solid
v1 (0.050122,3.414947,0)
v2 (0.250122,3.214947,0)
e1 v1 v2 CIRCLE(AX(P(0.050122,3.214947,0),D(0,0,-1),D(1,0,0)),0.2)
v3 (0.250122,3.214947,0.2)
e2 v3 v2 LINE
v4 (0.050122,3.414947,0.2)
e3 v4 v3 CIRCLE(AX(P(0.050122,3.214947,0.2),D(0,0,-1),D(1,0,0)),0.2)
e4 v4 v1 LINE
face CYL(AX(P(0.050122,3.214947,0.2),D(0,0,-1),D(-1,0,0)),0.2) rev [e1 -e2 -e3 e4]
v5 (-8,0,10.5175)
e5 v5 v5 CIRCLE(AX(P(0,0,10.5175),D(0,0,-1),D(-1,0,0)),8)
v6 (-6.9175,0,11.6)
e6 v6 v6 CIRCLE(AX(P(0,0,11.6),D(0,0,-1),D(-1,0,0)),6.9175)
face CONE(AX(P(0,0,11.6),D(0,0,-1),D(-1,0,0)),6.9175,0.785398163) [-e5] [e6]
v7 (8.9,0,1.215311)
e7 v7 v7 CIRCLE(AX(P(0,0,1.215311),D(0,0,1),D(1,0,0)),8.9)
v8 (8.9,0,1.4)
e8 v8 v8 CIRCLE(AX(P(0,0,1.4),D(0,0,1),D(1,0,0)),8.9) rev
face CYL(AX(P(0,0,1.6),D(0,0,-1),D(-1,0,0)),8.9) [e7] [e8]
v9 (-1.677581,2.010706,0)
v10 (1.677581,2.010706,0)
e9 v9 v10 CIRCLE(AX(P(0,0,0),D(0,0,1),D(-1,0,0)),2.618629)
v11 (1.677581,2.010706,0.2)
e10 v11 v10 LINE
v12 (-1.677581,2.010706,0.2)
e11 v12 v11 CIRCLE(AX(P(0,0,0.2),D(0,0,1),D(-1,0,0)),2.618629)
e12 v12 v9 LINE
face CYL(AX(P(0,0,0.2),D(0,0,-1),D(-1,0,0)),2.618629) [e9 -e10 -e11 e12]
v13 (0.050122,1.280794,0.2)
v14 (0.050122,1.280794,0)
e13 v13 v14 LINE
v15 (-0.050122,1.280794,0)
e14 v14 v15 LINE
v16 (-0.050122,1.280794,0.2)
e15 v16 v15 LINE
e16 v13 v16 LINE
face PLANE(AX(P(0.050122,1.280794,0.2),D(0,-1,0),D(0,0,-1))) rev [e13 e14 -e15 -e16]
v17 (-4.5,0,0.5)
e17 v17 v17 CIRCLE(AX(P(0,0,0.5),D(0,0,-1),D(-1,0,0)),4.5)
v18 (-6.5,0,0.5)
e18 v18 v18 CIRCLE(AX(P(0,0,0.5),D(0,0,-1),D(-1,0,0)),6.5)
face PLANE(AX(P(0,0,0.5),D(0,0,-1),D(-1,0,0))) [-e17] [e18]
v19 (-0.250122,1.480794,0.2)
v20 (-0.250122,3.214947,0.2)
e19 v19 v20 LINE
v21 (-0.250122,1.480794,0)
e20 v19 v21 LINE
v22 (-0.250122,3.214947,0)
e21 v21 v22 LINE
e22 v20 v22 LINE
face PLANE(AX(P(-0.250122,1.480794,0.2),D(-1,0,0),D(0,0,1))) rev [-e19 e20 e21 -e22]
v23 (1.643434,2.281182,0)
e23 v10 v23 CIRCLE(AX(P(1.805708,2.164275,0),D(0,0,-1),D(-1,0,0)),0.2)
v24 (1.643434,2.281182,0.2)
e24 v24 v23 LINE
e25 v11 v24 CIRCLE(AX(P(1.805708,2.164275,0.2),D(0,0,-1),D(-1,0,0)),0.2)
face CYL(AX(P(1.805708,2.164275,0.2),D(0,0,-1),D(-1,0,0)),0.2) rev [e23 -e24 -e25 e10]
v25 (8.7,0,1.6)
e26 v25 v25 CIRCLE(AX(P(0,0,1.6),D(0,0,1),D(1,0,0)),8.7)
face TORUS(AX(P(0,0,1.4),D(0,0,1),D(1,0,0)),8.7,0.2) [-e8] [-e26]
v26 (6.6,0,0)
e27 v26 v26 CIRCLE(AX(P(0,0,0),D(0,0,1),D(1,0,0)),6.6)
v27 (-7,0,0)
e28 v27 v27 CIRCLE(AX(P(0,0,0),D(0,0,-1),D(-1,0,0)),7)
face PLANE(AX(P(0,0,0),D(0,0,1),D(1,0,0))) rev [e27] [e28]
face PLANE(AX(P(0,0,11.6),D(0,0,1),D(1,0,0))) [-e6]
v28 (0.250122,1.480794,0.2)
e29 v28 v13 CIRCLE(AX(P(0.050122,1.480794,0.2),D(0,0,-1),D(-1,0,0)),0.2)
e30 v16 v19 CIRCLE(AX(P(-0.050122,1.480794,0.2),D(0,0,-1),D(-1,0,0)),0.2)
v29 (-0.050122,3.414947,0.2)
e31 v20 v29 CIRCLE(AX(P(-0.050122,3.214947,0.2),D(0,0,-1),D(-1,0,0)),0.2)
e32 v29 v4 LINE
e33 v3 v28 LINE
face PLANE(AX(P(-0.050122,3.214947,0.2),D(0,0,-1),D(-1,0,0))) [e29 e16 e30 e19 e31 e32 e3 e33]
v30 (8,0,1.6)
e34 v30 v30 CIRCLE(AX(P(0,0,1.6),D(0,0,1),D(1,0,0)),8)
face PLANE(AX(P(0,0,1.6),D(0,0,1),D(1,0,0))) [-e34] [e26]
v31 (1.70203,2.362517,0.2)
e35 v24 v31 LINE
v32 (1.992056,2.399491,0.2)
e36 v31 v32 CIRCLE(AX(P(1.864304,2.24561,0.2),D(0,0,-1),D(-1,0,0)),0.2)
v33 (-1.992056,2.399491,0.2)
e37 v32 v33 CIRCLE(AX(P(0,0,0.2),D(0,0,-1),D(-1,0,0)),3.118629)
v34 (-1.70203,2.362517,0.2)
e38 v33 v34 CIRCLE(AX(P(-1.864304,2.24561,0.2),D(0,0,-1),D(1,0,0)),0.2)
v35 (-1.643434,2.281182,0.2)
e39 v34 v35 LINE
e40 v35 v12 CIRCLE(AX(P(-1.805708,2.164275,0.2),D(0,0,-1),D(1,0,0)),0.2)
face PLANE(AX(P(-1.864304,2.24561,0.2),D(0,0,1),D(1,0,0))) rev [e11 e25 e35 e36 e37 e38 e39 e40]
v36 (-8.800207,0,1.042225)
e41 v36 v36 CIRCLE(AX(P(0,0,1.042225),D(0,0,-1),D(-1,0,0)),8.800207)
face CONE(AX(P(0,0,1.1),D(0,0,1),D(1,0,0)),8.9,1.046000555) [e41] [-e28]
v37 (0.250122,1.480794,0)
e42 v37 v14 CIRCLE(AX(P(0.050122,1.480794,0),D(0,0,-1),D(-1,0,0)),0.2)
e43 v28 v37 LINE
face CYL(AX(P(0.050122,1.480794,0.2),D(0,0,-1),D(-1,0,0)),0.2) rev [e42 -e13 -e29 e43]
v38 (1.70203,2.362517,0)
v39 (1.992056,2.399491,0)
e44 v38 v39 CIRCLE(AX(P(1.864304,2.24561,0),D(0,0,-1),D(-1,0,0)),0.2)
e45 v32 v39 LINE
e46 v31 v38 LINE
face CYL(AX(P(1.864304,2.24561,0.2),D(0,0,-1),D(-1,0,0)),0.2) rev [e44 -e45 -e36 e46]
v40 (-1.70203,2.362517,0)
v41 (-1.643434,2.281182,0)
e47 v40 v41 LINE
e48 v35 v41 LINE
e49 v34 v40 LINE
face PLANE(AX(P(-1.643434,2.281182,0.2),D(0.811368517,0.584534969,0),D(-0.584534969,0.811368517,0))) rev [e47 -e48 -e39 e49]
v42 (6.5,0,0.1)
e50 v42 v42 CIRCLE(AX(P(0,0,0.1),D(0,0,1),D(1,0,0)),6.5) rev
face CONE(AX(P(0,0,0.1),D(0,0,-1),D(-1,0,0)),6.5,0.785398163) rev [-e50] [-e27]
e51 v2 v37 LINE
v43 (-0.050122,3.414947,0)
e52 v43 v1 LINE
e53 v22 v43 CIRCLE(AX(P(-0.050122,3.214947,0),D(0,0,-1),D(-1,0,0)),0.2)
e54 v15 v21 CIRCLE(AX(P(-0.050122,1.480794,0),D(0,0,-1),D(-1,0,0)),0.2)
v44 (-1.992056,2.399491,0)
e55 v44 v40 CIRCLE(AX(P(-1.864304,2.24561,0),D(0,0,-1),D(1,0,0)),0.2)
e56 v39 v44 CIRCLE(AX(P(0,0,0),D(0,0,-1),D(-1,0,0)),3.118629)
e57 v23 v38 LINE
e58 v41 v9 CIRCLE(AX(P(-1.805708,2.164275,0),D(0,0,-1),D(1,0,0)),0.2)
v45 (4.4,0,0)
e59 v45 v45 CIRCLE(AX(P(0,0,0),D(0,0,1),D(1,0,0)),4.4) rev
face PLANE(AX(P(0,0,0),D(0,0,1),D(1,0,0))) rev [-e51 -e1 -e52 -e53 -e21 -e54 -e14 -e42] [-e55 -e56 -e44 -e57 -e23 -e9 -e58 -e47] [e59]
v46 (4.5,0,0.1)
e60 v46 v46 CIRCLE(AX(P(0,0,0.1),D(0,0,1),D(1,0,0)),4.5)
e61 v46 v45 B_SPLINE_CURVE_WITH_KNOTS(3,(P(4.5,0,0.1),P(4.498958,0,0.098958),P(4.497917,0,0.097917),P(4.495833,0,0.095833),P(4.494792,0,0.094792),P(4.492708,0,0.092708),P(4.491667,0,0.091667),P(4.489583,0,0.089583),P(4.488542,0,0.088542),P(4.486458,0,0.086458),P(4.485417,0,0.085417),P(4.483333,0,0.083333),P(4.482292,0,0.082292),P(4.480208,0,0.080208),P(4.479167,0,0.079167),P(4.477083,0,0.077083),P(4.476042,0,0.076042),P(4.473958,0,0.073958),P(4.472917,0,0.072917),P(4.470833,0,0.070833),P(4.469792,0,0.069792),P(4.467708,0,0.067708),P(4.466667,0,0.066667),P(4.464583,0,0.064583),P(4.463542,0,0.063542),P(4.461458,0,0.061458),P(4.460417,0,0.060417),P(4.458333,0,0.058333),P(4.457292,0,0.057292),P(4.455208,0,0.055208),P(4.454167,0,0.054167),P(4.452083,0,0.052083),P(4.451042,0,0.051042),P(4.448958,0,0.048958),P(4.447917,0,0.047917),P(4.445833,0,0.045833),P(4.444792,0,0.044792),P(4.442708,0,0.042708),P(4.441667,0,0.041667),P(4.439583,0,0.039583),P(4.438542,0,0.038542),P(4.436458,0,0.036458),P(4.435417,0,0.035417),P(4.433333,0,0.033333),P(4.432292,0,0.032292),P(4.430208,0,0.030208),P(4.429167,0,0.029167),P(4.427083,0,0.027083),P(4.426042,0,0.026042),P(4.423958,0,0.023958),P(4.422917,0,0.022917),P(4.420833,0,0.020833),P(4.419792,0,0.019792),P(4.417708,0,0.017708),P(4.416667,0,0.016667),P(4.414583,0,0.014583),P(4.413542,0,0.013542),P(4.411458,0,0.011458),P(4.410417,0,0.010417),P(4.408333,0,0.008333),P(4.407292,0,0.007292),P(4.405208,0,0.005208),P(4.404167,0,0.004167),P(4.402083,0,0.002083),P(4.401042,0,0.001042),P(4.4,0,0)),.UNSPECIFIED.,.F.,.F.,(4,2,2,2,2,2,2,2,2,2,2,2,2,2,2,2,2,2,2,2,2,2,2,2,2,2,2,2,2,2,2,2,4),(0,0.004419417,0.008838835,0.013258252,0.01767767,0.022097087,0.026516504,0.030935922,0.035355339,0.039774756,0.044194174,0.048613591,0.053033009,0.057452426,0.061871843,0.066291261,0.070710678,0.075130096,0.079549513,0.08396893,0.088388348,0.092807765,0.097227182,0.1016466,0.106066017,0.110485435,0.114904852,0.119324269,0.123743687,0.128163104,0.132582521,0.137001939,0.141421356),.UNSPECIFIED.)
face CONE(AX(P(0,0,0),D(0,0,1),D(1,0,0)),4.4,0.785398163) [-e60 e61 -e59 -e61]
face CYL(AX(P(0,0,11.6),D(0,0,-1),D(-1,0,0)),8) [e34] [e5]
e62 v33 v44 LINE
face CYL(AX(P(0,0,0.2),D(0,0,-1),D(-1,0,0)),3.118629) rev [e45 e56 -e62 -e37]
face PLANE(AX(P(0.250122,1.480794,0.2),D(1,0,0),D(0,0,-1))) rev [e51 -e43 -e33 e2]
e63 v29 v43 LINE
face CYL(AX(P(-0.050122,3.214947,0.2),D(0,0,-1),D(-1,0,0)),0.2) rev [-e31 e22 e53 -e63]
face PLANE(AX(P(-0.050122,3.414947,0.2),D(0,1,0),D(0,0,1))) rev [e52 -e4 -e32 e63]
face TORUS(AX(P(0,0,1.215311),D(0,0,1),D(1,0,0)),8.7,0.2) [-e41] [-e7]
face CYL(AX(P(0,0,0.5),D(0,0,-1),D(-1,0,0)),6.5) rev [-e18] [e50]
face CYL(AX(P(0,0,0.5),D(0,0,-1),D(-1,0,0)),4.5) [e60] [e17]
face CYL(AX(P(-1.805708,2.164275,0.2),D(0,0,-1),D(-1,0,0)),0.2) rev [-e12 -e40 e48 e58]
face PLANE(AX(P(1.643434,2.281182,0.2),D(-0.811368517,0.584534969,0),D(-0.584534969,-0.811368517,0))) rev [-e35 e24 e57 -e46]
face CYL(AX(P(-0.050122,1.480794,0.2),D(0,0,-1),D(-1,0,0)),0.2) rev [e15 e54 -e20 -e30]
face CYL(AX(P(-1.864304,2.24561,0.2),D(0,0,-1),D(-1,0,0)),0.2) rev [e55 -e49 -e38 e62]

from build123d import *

# Parameters (mm, degrees)
SKETCH_2_R          = 8.9
EXTRUDE_1_DEPTH     = 1.6
SKETCH_4_R          = 8
EXTRUDE_2_DEPTH     = 10
SKETCH_7_R          = 6.5
SKETCH_7_R_2        = 4.5
CUT_EXTRUDE_1_DEPTH = 0.5
CUT_EXTRUDE_2_DEPTH = 0.2
CHAMFER_1_SIZE      = 0.1
FILLET_1_R          = 0.2


# Read off the part's stored shape, not the designer's step: M16 机械螺纹 螺柱1
with BuildPart() as part:
    # 草图2 → 凸台-拉伸1 (new body)
    with BuildSketch(Plane.XY):
        Circle(SKETCH_2_R)
    extrude(amount=EXTRUDE_1_DEPTH)

    # 草图3 → 切除-旋转1 (revolve, cut)
    with BuildSketch(Plane(origin=(0, 0, 0), x_dir=(1, 0, 0), z_dir=(0, 1, 0))):
        Polygon((-8.9, -1.1), (-7, 0), (-8.9, 0), align=None)
    revolve(axis=Axis((0, 0, -2.565533084), (0, 0, 1)), mode=Mode.SUBTRACT)

    # 草图4 → 凸台-拉伸2 (add)
    with BuildSketch(Plane.XY.offset(1.6)):
        Circle(SKETCH_4_R)
    extrude(amount=EXTRUDE_2_DEPTH)

    # M16 机械螺纹 螺柱1 outline → M16 机械螺纹 螺柱1 (revolve, cut)
    with BuildSketch(Plane.XZ):
        Polygon((8, 11.6), (6.9175, 11.6), (8, 10.5175), align=None)
    revolve(axis=Axis((0, 0, 0), (0, 0, 1)), mode=Mode.SUBTRACT)

    # 草图7 → 切除-拉伸1 (cut)
    with BuildSketch(Plane(origin=(0, 0, 0), x_dir=(-1, 0, 0), z_dir=(0, 0, -1))):
        Circle(SKETCH_7_R)
        Circle(SKETCH_7_R_2, mode=Mode.SUBTRACT)
    extrude(amount=-CUT_EXTRUDE_1_DEPTH, mode=Mode.SUBTRACT)

    # 草图8 → 切除-拉伸2 (cut)
    with BuildSketch(Plane(origin=(0, 0, 0), x_dir=(-1, 0, 0), z_dir=(0, 0, -1))):
        with BuildLine():
            Line((1.643434087, 2.281182047), (1.702030214, 2.362516878))
            ThreePointArc((1.702030214, 2.362516878), (1.839011457, 2.444004167), (1.992055967, 2.399491052))
            ThreePointArc((1.992055967, 2.399491052), (0, -3.11862859), (-1.992055967, 2.399491052))
            ThreePointArc((-1.992055967, 2.399491052), (-1.839011457, 2.444004167), (-1.702030214, 2.362516878))
            Line((-1.702030214, 2.362516878), (-1.643434087, 2.281182047))
            ThreePointArc((-1.643434087, 2.281182047), (-1.607282835, 2.139224365), (-1.677581098, 2.010705686))
            ThreePointArc((-1.677581098, 2.010705686), (0, -2.61862859), (1.677581098, 2.010705686))
            ThreePointArc((1.677581098, 2.010705686), (1.607282835, 2.139224365), (1.643434087, 2.281182047))
        make_face()
        with BuildLine():
            Line((-0.050122003, 1.280793561), (0.050122003, 1.280793561))
            ThreePointArc((0.050122003, 1.280793561), (0.191543359, 1.339372204), (0.250122003, 1.480793561))
            Line((0.250122003, 1.480793561), (0.250122003, 3.214947097))
            ThreePointArc((0.250122003, 3.214947097), (0.191543359, 3.356368453), (0.050122003, 3.414947097))
            Line((0.050122003, 3.414947097), (-0.050122003, 3.414947097))
            ThreePointArc((-0.050122003, 3.414947097), (-0.191543359, 3.356368453), (-0.250122003, 3.214947097))
            Line((-0.250122003, 3.214947097), (-0.250122003, 1.480793561))
            ThreePointArc((-0.250122003, 1.480793561), (-0.191543359, 1.339372204), (-0.050122003, 1.280793561))
        make_face()
    extrude(amount=-CUT_EXTRUDE_2_DEPTH, mode=Mode.SUBTRACT)

    # 倒角1
    chamfer_1_edges = [part.edges().sort_by_distance(p)[0] for p in [
        (6.5, 0, 0),
        (4.5, 0, 0),
    ]]
    chamfer(chamfer_1_edges, length=CHAMFER_1_SIZE)

    # 圆角1
    fillet_1_edges = [part.edges().sort_by_distance(p)[0] for p in [
        (-8.9, 0, 1.6),
        (0, 8.9, 1.1),
    ]]
    fillet(fillet_1_edges, radius=FILLET_1_R)


solid = part.part
